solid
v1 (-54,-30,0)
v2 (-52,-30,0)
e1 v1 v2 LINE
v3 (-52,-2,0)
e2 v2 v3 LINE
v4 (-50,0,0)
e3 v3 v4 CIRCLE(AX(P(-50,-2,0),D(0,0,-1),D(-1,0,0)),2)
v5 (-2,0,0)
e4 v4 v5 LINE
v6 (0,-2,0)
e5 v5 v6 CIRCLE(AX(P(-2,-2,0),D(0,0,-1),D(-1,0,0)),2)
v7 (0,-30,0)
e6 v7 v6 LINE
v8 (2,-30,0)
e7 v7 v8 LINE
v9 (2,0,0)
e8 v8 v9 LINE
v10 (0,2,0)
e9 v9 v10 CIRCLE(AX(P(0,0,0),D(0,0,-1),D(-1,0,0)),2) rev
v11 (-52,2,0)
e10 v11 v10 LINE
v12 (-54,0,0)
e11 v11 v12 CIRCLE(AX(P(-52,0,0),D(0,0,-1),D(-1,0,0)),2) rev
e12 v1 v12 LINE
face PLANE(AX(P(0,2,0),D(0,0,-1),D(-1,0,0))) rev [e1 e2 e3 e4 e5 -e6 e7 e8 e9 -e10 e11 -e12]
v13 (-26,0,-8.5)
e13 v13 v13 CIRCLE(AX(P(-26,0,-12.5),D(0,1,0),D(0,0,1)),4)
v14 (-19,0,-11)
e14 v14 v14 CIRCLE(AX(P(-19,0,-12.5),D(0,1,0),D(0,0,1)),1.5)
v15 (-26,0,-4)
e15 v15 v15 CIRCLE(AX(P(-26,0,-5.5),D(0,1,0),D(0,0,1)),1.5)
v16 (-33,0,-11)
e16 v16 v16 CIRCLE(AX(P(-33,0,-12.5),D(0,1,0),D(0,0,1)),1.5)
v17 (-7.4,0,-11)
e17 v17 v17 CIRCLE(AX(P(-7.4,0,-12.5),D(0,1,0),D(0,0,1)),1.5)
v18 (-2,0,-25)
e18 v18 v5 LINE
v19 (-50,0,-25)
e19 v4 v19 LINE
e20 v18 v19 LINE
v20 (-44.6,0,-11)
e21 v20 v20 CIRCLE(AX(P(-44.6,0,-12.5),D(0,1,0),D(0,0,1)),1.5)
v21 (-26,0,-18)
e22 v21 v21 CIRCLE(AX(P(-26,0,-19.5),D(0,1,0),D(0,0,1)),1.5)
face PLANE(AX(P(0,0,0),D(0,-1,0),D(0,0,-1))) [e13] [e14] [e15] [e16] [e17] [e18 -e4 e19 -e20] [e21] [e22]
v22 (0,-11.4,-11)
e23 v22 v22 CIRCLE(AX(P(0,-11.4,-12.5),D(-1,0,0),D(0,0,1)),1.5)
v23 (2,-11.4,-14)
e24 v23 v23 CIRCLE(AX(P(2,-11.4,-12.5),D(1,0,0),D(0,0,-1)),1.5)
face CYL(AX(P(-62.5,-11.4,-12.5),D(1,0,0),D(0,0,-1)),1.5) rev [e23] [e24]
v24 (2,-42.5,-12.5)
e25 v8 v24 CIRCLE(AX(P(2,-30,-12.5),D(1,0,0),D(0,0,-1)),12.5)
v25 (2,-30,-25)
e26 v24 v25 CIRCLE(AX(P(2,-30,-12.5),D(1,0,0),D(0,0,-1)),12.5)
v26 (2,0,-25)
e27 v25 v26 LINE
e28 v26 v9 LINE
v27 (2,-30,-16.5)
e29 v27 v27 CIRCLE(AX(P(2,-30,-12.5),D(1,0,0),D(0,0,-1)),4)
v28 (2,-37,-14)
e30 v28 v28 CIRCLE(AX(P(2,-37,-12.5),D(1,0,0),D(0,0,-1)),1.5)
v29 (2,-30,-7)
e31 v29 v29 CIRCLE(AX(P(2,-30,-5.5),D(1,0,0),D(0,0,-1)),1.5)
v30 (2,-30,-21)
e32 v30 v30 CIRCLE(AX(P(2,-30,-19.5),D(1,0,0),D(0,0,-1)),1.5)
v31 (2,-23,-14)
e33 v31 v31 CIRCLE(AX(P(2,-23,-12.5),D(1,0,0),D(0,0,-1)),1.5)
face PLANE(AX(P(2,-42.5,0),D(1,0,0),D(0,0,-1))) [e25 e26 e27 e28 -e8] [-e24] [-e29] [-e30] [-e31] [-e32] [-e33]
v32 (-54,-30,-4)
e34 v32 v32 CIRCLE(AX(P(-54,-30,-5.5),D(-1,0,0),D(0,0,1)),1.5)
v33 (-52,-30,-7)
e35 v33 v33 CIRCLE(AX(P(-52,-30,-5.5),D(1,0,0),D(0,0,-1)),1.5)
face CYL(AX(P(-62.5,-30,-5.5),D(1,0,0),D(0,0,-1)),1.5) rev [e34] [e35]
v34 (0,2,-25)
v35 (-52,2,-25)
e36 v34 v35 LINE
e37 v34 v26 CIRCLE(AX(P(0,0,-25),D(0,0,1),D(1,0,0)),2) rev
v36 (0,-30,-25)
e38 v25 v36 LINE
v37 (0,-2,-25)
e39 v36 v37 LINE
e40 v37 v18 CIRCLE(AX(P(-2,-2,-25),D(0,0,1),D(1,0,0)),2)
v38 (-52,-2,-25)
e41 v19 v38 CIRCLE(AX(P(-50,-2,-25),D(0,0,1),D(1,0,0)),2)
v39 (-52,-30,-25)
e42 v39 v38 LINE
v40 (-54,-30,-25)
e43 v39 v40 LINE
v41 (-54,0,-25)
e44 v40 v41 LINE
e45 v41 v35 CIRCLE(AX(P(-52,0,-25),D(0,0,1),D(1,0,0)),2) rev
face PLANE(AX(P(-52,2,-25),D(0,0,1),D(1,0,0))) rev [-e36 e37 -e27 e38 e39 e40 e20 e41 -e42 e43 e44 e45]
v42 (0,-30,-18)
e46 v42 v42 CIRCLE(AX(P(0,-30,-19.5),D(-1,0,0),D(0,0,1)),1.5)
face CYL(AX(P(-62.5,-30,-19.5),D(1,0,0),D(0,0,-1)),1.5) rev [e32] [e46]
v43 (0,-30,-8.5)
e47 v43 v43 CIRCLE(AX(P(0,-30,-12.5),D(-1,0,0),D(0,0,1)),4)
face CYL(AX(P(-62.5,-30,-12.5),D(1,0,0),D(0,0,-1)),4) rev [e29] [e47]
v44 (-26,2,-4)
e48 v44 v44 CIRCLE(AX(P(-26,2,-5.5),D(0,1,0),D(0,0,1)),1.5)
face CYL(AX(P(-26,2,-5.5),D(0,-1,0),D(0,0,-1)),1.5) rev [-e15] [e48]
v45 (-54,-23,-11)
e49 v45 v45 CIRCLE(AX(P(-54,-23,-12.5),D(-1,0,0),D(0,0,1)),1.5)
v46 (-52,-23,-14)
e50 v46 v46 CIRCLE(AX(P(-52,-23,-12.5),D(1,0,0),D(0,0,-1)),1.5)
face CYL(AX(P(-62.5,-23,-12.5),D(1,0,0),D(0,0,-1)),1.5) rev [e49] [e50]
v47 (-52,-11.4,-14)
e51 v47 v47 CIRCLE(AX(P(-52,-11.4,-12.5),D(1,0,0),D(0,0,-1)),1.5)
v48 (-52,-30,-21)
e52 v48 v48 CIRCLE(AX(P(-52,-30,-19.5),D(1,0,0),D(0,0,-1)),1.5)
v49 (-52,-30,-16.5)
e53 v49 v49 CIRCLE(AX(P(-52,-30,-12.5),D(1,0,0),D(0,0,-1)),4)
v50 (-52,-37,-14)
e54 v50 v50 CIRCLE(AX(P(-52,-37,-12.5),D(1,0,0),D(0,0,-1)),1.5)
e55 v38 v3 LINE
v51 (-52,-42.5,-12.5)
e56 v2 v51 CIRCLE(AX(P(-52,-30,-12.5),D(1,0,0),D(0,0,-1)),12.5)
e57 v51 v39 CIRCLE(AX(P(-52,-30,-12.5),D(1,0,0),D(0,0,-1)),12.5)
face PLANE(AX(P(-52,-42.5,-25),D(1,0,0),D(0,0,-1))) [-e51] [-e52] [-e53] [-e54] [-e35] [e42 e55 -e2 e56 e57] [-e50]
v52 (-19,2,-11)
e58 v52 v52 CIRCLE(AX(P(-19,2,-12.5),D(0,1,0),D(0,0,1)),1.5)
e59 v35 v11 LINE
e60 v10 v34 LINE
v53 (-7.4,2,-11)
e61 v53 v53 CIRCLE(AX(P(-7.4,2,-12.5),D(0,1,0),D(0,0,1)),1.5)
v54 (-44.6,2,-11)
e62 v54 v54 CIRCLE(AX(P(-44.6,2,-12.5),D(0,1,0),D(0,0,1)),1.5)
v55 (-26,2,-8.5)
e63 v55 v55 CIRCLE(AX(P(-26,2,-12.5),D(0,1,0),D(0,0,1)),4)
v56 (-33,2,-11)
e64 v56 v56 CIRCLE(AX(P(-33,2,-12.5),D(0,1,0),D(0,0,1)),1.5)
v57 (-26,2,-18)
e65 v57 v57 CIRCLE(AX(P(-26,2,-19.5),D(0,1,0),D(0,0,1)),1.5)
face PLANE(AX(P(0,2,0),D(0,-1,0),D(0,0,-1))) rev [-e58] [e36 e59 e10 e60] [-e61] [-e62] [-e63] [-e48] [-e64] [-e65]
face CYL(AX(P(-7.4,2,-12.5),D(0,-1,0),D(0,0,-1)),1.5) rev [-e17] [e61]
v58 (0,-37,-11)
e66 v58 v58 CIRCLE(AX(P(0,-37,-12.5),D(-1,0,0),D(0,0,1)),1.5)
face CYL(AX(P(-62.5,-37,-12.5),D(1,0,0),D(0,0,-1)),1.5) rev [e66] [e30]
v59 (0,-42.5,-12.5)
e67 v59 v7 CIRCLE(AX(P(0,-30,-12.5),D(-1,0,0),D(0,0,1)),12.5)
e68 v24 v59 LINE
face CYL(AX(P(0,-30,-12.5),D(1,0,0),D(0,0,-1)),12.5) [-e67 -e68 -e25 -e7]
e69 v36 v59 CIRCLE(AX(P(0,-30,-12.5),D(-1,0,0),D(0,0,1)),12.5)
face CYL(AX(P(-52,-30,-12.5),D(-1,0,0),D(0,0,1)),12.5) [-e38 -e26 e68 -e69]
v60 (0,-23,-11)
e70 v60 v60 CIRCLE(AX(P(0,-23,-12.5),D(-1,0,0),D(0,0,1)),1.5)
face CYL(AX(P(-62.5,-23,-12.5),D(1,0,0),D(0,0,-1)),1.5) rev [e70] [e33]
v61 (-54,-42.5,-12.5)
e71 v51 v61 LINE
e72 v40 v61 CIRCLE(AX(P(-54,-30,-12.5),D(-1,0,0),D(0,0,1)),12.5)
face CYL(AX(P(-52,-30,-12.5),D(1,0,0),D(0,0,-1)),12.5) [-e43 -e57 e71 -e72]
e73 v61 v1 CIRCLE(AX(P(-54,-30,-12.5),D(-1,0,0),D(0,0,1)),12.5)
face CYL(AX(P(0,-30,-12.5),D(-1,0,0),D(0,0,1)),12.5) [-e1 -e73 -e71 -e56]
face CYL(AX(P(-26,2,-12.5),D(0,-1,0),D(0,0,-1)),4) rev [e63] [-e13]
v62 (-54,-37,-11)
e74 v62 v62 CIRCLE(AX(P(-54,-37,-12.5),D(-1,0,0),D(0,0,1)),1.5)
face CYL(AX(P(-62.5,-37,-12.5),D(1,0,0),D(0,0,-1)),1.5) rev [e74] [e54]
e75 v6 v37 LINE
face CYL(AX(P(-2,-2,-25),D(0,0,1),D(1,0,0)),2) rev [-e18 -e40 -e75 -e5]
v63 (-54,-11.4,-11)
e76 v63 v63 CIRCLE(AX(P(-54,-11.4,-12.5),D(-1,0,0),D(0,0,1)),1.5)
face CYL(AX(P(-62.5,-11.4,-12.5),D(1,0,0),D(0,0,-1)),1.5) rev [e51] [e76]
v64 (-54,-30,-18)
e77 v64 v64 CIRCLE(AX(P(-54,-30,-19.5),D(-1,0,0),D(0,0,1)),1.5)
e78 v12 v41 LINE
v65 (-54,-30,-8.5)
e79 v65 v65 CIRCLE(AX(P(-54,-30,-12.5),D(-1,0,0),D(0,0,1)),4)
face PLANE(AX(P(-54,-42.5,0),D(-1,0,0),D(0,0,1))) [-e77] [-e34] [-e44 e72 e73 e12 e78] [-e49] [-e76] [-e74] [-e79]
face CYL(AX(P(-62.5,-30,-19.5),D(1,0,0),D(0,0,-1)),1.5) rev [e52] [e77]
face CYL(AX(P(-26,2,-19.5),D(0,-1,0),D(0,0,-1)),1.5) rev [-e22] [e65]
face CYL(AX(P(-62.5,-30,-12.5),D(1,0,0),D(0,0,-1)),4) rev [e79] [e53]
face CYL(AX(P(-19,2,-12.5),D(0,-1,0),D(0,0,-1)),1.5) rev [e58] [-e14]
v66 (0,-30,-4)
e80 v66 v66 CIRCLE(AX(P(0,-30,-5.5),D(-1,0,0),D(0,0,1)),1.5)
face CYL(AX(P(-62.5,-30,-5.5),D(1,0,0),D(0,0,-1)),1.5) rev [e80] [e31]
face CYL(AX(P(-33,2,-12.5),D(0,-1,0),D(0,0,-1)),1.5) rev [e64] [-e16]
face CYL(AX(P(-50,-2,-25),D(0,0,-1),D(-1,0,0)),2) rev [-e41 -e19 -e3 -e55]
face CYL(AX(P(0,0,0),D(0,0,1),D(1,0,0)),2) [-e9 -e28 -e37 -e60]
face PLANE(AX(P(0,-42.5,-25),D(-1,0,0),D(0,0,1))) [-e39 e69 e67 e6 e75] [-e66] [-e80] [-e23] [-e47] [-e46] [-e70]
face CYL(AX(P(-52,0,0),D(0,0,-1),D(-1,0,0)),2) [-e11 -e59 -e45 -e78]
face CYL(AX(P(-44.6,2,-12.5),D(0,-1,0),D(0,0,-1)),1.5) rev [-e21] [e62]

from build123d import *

# Parameters (mm, degrees)
SKETCH_1_W          = 52
SKETCH_1_H          = 25
SKETCH_1_R          = 4
SKETCH_1_R_2        = 1.5
EXTRUDE_1_DEPTH     = 2
SKETCH_2_W          = 2
SKETCH_2_H          = 25
EXTRUDE_2_DEPTH     = 44.5
FILLET_1_R          = 12.5
FILLET_2_R          = 12.5
SKETCH_3_R          = 4
SKETCH_3_R_2        = 1.5
CUT_EXTRUDE_1_DEPTH = 64.5
FILLET_5_R          = 2


with BuildPart() as part:
    # 草图1 → 凸台-拉伸1 (new body)
    with BuildSketch(Plane(origin=(0, 0, 0), x_dir=(1, 0, 0), z_dir=(0, 1, 0))):
        with Locations((-26, 12.5)):
            Rectangle(SKETCH_1_W, SKETCH_1_H)
        with Locations(Location((-26, 12.5, 0), (0, 0, 270))):
            Circle(SKETCH_1_R, mode=Mode.SUBTRACT)
        with Locations(Location((-26, 5.5, 0), (0, 0, 270))):
            Circle(SKETCH_1_R_2, mode=Mode.SUBTRACT)
        with Locations(Location((-33, 12.5, 0), (0, 0, 270))):
            Circle(SKETCH_1_R_2, mode=Mode.SUBTRACT)
        with Locations(Location((-26, 19.5, 0), (0, 0, 270))):
            Circle(SKETCH_1_R_2, mode=Mode.SUBTRACT)
        with Locations(Location((-19, 12.5, 0), (0, 0, 270))):
            Circle(SKETCH_1_R_2, mode=Mode.SUBTRACT)
        with Locations(Location((-7.4, 12.5, 0), (0, 0, 270))):
            Circle(SKETCH_1_R_2, mode=Mode.SUBTRACT)
        with Locations(Location((-44.6, 12.5, 0), (0, 0, 270))):
            Circle(SKETCH_1_R_2, mode=Mode.SUBTRACT)
    extrude(amount=EXTRUDE_1_DEPTH)

    # 草图2 → 凸台-拉伸2 (add)
    with BuildSketch(Plane(origin=(0, 2, 0), x_dir=(1, 0, 0), z_dir=(0, 1, 0))):
        with Locations((-53, 12.5)):
            Rectangle(SKETCH_2_W, SKETCH_2_H)
        with Locations((1, 12.5)):
            Rectangle(SKETCH_2_W, SKETCH_2_H)
    extrude(amount=-EXTRUDE_2_DEPTH)

    # 圆角1
    fillet_1_edges = [part.edges().sort_by_distance(p)[0] for p in [
        (-53, -42.5, -25),
        (-53, -42.5, 0),
    ]]
    fillet(fillet_1_edges, radius=FILLET_1_R - 0.0001)  # a hair under: the kernel refuses the full size

    # 圆角2
    fillet_2_edges = [part.edges().sort_by_distance(p)[0] for p in [
        (1, -42.5, -25),
        (1, -42.5, 0),
    ]]
    fillet(fillet_2_edges, radius=FILLET_2_R - 0.0001)  # a hair under: the kernel refuses the full size

    # 草图3 → 切除-拉伸1 (cut)
    with BuildSketch(Plane(origin=(2, 0, 0), x_dir=(0, 0, -1), z_dir=(1, 0, 0))):
        with Locations((12.5, -30)):
            Circle(SKETCH_3_R)
        with Locations((12.5, -23)):
            Circle(SKETCH_3_R_2)
        with Locations((19.5, -30)):
            Circle(SKETCH_3_R_2)
        with Locations((12.5, -37)):
            Circle(SKETCH_3_R_2)
        with Locations((5.5, -30)):
            Circle(SKETCH_3_R_2)
        with Locations((12.5, -11.4)):
            Circle(SKETCH_3_R_2)
    extrude(amount=-CUT_EXTRUDE_1_DEPTH, mode=Mode.SUBTRACT)

    # 圆角5
    fillet_5_edges = [part.edges().sort_by_distance(p)[0] for p in [
        (-54, 2, -12.5),
        (-52, 0, -12.5),
        (2, 2, -12.5),
        (0, 0, -12.5),
    ]]
    fillet(fillet_5_edges, radius=FILLET_5_R)


solid = part.part
